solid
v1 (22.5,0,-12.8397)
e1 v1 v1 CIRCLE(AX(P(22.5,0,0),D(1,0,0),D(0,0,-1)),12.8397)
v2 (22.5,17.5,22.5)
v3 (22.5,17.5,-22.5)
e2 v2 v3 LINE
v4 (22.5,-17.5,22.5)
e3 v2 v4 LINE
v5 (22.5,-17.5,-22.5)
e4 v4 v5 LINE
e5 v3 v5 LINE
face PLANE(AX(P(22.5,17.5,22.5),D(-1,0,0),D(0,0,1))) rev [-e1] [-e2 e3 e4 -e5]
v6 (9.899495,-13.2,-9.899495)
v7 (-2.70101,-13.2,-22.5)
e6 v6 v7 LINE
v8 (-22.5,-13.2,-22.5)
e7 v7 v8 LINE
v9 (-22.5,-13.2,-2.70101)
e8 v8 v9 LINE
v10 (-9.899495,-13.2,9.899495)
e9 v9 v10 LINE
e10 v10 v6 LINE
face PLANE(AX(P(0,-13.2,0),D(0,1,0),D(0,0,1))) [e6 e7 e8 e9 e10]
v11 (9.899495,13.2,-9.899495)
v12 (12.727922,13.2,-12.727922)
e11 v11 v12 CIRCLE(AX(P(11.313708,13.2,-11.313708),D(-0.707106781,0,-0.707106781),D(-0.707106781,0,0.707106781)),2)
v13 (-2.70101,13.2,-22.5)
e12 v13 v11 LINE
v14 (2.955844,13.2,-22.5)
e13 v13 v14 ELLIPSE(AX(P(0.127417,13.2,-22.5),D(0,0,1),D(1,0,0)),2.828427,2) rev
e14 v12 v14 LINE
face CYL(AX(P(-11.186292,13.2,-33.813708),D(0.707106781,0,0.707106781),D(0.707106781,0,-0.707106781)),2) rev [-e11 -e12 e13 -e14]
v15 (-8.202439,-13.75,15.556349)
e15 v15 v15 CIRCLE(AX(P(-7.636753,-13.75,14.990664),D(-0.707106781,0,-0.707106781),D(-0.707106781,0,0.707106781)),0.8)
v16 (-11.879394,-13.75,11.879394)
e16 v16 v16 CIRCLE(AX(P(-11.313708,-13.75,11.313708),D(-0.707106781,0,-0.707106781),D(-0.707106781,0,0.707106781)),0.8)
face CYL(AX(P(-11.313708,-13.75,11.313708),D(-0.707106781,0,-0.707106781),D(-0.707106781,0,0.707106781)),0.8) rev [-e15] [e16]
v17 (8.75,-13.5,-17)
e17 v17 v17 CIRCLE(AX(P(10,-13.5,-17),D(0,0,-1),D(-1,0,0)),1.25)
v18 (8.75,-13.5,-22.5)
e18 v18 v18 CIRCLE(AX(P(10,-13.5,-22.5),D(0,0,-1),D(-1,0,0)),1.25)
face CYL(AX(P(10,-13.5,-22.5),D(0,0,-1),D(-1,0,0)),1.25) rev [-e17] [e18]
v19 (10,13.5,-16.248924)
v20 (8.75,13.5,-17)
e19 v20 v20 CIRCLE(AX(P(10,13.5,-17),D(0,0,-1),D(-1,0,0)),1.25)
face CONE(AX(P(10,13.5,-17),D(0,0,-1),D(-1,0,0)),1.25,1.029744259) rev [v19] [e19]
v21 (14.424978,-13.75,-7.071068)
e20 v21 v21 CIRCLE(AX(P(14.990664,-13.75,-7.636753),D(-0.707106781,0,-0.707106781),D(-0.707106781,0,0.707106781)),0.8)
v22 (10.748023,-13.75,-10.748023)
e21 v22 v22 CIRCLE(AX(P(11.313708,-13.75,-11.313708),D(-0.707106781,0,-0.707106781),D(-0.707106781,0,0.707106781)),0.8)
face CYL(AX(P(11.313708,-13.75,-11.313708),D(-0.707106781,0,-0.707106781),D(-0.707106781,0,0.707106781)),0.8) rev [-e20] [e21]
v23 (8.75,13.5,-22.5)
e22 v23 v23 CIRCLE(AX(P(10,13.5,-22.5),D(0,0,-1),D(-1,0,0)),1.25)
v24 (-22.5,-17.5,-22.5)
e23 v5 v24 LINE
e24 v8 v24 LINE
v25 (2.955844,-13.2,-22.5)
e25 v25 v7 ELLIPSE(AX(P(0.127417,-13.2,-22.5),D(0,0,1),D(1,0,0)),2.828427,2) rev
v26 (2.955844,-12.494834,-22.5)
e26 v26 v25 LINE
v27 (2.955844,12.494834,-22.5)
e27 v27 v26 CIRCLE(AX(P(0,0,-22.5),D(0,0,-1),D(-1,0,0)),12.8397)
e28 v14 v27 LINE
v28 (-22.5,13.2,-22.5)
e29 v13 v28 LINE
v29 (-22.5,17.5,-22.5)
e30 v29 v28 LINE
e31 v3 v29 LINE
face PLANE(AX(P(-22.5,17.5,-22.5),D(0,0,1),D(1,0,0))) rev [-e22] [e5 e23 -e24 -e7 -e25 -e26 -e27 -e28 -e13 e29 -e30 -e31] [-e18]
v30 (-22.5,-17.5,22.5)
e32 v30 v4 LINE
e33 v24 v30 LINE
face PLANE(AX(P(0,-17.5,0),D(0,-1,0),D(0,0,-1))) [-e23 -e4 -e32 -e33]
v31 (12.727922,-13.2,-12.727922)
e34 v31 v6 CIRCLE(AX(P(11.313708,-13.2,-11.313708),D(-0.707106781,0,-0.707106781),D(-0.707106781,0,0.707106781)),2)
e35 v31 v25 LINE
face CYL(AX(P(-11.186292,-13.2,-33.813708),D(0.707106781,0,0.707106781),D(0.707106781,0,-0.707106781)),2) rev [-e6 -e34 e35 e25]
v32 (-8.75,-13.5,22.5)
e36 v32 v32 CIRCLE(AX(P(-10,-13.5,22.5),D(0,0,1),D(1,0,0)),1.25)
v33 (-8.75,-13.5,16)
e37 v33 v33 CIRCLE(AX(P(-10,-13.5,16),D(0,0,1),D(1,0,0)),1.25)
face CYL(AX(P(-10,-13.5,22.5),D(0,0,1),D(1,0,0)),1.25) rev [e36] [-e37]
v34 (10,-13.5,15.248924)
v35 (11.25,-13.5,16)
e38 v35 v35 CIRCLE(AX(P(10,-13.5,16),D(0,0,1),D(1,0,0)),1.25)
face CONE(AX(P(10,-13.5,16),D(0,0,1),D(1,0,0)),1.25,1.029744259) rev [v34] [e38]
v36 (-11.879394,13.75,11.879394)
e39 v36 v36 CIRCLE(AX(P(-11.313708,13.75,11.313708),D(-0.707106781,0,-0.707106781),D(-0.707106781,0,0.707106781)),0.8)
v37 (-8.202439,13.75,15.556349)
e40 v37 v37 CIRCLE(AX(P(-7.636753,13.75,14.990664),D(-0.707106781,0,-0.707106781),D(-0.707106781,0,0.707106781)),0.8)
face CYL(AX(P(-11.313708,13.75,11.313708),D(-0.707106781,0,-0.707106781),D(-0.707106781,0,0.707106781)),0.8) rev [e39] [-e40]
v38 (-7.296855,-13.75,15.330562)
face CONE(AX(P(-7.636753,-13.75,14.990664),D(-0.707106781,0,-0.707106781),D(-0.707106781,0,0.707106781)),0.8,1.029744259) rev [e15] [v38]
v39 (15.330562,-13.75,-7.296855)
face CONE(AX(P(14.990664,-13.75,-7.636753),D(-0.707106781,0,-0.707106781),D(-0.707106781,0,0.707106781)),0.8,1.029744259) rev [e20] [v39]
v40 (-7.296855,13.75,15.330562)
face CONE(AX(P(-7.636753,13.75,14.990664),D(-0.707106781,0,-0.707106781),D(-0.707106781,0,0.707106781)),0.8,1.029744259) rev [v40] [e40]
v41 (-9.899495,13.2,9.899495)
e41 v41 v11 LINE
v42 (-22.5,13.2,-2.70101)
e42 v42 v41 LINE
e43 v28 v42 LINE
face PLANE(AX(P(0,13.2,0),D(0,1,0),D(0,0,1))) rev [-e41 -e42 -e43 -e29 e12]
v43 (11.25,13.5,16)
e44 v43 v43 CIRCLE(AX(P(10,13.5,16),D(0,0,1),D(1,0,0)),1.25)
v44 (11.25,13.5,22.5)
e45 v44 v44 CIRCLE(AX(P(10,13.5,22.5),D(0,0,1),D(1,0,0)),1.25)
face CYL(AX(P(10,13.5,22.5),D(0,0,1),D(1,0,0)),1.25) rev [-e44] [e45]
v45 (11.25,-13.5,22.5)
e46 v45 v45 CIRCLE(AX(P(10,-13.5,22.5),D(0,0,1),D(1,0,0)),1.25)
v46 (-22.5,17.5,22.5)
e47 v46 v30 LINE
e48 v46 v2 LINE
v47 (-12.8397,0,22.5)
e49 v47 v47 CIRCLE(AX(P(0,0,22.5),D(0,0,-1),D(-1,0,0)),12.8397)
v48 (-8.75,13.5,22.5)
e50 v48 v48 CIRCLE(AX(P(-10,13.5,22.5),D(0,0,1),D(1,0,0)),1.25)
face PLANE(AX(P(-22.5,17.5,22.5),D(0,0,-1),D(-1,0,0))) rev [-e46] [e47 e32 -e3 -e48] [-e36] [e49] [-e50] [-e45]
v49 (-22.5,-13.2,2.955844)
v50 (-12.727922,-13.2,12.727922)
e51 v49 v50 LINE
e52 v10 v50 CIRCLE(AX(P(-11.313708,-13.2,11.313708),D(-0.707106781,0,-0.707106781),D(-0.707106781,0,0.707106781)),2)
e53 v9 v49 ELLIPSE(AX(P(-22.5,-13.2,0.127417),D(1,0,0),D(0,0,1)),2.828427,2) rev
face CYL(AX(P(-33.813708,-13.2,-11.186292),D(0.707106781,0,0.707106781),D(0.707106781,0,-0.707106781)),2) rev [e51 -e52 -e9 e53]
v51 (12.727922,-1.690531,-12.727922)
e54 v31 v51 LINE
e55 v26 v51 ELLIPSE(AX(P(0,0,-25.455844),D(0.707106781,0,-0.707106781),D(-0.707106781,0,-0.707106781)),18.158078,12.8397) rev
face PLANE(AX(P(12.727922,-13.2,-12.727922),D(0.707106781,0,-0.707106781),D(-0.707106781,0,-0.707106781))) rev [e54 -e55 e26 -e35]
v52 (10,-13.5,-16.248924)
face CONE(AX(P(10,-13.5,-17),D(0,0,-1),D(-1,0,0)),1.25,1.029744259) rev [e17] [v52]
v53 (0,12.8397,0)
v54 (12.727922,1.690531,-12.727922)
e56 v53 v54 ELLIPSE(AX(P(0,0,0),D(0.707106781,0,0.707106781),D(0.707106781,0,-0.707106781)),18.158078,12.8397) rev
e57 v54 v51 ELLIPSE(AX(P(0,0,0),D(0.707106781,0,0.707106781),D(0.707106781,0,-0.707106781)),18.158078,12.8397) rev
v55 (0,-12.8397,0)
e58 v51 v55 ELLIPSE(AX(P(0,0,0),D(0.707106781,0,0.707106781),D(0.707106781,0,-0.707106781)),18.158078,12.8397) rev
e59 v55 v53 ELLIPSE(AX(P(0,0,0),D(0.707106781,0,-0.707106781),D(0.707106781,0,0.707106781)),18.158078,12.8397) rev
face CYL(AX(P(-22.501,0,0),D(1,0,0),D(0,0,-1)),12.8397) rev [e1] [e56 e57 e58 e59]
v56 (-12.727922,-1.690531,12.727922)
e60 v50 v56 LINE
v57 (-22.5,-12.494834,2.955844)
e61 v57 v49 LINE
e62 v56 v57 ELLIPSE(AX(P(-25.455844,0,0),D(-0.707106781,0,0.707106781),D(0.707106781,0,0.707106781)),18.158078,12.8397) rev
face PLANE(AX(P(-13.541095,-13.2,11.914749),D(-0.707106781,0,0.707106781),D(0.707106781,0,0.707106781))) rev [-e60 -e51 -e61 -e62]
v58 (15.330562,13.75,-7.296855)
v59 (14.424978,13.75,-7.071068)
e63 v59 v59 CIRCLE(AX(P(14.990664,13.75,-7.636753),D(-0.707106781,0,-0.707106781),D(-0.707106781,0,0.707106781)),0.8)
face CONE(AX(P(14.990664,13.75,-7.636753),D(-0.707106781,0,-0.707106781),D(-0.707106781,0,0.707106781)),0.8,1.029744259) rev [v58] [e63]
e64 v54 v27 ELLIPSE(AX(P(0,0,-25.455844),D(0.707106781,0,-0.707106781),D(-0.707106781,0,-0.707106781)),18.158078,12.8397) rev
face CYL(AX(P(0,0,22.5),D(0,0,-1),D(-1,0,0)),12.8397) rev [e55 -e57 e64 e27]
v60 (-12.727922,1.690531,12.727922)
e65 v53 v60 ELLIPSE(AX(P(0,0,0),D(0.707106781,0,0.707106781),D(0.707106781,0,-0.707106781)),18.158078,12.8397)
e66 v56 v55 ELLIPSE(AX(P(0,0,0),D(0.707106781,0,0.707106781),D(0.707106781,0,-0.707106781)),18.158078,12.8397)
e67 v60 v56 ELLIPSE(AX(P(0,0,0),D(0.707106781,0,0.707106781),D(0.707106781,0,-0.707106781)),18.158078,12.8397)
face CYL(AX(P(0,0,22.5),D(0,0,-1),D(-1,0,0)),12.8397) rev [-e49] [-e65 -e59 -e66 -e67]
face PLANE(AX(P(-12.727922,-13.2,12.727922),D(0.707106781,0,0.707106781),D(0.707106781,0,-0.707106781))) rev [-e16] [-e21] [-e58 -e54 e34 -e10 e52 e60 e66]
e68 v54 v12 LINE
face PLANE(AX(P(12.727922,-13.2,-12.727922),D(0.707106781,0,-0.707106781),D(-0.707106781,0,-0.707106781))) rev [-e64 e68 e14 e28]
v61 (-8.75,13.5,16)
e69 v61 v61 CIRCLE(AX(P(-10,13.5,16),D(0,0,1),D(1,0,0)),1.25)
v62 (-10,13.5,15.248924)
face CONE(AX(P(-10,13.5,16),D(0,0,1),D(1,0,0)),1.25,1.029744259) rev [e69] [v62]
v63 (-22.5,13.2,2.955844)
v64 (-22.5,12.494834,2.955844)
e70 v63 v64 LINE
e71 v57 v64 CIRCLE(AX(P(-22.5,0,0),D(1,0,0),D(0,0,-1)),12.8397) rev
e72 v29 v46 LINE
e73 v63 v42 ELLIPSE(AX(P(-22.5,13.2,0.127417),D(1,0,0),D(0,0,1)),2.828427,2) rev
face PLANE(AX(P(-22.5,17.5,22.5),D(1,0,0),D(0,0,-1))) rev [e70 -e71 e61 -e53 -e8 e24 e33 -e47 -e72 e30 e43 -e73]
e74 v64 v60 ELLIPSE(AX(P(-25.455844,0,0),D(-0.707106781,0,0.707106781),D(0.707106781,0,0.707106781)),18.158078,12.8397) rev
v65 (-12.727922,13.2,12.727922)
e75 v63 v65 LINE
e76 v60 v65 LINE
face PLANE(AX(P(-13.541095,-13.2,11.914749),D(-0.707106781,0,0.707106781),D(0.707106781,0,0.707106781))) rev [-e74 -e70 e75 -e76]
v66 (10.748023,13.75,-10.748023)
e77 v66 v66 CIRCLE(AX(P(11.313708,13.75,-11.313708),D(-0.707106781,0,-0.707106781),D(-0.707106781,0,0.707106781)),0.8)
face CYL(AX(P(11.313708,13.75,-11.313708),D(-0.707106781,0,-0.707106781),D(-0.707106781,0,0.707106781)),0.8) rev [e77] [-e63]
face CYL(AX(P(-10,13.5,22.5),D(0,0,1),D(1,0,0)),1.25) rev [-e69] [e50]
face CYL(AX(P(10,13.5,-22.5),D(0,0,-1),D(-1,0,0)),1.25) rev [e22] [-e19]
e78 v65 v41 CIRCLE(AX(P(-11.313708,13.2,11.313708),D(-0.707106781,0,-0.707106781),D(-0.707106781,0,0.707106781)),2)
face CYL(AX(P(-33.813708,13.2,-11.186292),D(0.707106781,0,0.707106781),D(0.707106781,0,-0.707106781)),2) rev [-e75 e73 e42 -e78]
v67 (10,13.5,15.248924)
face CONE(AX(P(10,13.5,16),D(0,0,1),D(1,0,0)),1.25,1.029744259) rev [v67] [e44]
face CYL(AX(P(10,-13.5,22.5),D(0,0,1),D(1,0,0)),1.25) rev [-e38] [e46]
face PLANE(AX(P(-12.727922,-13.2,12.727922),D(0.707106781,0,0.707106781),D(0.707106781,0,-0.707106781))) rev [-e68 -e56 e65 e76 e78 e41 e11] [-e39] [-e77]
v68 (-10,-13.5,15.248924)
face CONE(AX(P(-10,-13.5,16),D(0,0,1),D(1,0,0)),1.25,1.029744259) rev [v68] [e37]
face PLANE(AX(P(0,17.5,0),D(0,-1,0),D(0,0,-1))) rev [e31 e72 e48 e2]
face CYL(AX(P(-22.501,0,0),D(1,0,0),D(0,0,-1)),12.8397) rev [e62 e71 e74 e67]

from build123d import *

# Parameters (mm, degrees)
SKETCH1_W             = 45
SKETCH1_H             = 45
BOSS_EXTRUDE1_DEPTH   = 17.5
CUT_EXTRUDE1_REACH    = 55.268
SKETCH2_R             = 12.8397
SKETCH3_R             = 12.8397
CUT_EXTRUDE2_DEPTH    = 54.268189382
CUT_EXTRUDE3_DEPTH    = 13.2
CUT_EXTRUDE4_DEPTH    = 31.819805153
M3_TAPPED_HOLE1_D     = 2.5
M3_TAPPED_HOLE1_DEPTH = 6.5
M3_TAPPED_HOLE1_TIP   = 0.751075774
M3_TAPPED_HOLE2_D     = 2.5
M3_TAPPED_HOLE2_DEPTH = 5.5
M3_TAPPED_HOLE2_TIP   = 0.751075774
M2_TAPPED_HOLE1_D     = 1.6
M2_TAPPED_HOLE1_DEPTH = 5.2
M2_TAPPED_HOLE1_TIP   = 0.480688495


# Read off the part's stored shape, not the designer's step: Cut-Extrude4
with BuildPart() as part:
    # Sketch1 → Boss-Extrude1 (new, symmetric)
    with BuildSketch(Plane(origin=(0, 0, 0), x_dir=(1, 0, 0), z_dir=(0, 1, 0))):
        Rectangle(SKETCH1_W, SKETCH1_H)
    extrude(amount=BOSS_EXTRUDE1_DEPTH, both=True)

    # Sketch2 → Cut-Extrude1 (cut, up to next)
    with BuildSketch(Plane(origin=(22.5, 0, 0), x_dir=(0, 0, -1), z_dir=(1, 0, 0)), mode=Mode.PRIVATE) as cut_extrude1_sk1:
        Circle(SKETCH2_R)
    cut_extrude1_tool1 = extrude(cut_extrude1_sk1.sketch, amount=-CUT_EXTRUDE1_REACH, mode=Mode.PRIVATE) & part.part
    add(cut_extrude1_tool1.solids().sort_by_distance((22.5, 0, 0))[0], mode=Mode.SUBTRACT)

    # Sketch3 → Cut-Extrude2 (cut, through all)
    with BuildSketch(Plane(origin=(0, 0, -22.5), x_dir=(-1, 0, 0), z_dir=(0, 0, -1))):
        Circle(SKETCH3_R)
    extrude(amount=-CUT_EXTRUDE2_DEPTH, mode=Mode.SUBTRACT)

    # Sketch5 → Cut-Extrude3 (cut, symmetric)
    with BuildSketch(Plane(origin=(0, 0, 0), x_dir=(1, 0, 0), z_dir=(0, 1, 0))):
        Polygon((-12.727922061, -12.727922061), (12.727922061, 12.727922061), (11.914749263, 13.54109486), (-13.54109486, -11.914749263), align=None)
    extrude(amount=CUT_EXTRUDE3_DEPTH, both=True, mode=Mode.SUBTRACT)

    # Cut-Extrude4 outline → Cut-Extrude4 (cut)
    with BuildSketch(Plane(origin=(0, 0, 0), x_dir=(-0.7071067811865486, 0, 0.7071067811865465), z_dir=(-0.7071067811865465, 0, -0.7071067811865486))):
        with BuildLine():
            ThreePointArc((-14, 13.2), (-16, 15.2), (-18, 13.2))
            Line((-18, 13.2), (-18, -13.2))
            ThreePointArc((-18, -13.2), (-16, -15.2), (-14, -13.2))
            Line((-14, -13.2), (14, -13.2))
            ThreePointArc((14, -13.2), (16, -15.2), (18, -13.2))
            Line((18, -13.2), (18, 13.2))
            ThreePointArc((18, 13.2), (16, 15.2), (14, 13.2))
            Line((14, 13.2), (-14, 13.2))
        make_face()
    extrude(amount=CUT_EXTRUDE4_DEPTH, mode=Mode.SUBTRACT)

    # M3 Tapped Hole1
    with Locations(Plane.XY.offset(22.5)):
        with Locations((-10, -13.5), (10, -13.5), (10, 13.5), (-10, 13.5)):
            Hole(M3_TAPPED_HOLE1_D / 2, depth=M3_TAPPED_HOLE1_DEPTH)
            with Locations((0, 0, -(M3_TAPPED_HOLE1_DEPTH + M3_TAPPED_HOLE1_TIP / 2))):  # 118° drill point
                Cone(0, M3_TAPPED_HOLE1_D / 2, M3_TAPPED_HOLE1_TIP, mode=Mode.SUBTRACT)

    # M3 Tapped Hole2
    with Locations(Plane(origin=(0, 0, -22.5), x_dir=(-1, 0, 0), z_dir=(0, 0, -1))):
        with Locations((-10, 13.5), (-10, -13.5)):
            Hole(M3_TAPPED_HOLE2_D / 2, depth=M3_TAPPED_HOLE2_DEPTH)
            with Locations((0, 0, -(M3_TAPPED_HOLE2_DEPTH + M3_TAPPED_HOLE2_TIP / 2))):  # 118° drill point
                Cone(0, M3_TAPPED_HOLE2_D / 2, M3_TAPPED_HOLE2_TIP, mode=Mode.SUBTRACT)

    # M2 Tapped Hole1
    with Locations(Plane(origin=(0, 0, 0), x_dir=(-0.7071067811865486, 0, 0.7071067811865465), z_dir=(-0.7071067811865465, 0, -0.7071067811865486))):
        with Locations((-16, -13.75), (-16, 13.75), (16, 13.75), (16, -13.75)):
            Hole(M2_TAPPED_HOLE1_D / 2, depth=M2_TAPPED_HOLE1_DEPTH)
            with Locations((0, 0, -(M2_TAPPED_HOLE1_DEPTH + M2_TAPPED_HOLE1_TIP / 2))):  # 118° drill point
                Cone(0, M2_TAPPED_HOLE1_D / 2, M2_TAPPED_HOLE1_TIP, mode=Mode.SUBTRACT)


solid = part.part
